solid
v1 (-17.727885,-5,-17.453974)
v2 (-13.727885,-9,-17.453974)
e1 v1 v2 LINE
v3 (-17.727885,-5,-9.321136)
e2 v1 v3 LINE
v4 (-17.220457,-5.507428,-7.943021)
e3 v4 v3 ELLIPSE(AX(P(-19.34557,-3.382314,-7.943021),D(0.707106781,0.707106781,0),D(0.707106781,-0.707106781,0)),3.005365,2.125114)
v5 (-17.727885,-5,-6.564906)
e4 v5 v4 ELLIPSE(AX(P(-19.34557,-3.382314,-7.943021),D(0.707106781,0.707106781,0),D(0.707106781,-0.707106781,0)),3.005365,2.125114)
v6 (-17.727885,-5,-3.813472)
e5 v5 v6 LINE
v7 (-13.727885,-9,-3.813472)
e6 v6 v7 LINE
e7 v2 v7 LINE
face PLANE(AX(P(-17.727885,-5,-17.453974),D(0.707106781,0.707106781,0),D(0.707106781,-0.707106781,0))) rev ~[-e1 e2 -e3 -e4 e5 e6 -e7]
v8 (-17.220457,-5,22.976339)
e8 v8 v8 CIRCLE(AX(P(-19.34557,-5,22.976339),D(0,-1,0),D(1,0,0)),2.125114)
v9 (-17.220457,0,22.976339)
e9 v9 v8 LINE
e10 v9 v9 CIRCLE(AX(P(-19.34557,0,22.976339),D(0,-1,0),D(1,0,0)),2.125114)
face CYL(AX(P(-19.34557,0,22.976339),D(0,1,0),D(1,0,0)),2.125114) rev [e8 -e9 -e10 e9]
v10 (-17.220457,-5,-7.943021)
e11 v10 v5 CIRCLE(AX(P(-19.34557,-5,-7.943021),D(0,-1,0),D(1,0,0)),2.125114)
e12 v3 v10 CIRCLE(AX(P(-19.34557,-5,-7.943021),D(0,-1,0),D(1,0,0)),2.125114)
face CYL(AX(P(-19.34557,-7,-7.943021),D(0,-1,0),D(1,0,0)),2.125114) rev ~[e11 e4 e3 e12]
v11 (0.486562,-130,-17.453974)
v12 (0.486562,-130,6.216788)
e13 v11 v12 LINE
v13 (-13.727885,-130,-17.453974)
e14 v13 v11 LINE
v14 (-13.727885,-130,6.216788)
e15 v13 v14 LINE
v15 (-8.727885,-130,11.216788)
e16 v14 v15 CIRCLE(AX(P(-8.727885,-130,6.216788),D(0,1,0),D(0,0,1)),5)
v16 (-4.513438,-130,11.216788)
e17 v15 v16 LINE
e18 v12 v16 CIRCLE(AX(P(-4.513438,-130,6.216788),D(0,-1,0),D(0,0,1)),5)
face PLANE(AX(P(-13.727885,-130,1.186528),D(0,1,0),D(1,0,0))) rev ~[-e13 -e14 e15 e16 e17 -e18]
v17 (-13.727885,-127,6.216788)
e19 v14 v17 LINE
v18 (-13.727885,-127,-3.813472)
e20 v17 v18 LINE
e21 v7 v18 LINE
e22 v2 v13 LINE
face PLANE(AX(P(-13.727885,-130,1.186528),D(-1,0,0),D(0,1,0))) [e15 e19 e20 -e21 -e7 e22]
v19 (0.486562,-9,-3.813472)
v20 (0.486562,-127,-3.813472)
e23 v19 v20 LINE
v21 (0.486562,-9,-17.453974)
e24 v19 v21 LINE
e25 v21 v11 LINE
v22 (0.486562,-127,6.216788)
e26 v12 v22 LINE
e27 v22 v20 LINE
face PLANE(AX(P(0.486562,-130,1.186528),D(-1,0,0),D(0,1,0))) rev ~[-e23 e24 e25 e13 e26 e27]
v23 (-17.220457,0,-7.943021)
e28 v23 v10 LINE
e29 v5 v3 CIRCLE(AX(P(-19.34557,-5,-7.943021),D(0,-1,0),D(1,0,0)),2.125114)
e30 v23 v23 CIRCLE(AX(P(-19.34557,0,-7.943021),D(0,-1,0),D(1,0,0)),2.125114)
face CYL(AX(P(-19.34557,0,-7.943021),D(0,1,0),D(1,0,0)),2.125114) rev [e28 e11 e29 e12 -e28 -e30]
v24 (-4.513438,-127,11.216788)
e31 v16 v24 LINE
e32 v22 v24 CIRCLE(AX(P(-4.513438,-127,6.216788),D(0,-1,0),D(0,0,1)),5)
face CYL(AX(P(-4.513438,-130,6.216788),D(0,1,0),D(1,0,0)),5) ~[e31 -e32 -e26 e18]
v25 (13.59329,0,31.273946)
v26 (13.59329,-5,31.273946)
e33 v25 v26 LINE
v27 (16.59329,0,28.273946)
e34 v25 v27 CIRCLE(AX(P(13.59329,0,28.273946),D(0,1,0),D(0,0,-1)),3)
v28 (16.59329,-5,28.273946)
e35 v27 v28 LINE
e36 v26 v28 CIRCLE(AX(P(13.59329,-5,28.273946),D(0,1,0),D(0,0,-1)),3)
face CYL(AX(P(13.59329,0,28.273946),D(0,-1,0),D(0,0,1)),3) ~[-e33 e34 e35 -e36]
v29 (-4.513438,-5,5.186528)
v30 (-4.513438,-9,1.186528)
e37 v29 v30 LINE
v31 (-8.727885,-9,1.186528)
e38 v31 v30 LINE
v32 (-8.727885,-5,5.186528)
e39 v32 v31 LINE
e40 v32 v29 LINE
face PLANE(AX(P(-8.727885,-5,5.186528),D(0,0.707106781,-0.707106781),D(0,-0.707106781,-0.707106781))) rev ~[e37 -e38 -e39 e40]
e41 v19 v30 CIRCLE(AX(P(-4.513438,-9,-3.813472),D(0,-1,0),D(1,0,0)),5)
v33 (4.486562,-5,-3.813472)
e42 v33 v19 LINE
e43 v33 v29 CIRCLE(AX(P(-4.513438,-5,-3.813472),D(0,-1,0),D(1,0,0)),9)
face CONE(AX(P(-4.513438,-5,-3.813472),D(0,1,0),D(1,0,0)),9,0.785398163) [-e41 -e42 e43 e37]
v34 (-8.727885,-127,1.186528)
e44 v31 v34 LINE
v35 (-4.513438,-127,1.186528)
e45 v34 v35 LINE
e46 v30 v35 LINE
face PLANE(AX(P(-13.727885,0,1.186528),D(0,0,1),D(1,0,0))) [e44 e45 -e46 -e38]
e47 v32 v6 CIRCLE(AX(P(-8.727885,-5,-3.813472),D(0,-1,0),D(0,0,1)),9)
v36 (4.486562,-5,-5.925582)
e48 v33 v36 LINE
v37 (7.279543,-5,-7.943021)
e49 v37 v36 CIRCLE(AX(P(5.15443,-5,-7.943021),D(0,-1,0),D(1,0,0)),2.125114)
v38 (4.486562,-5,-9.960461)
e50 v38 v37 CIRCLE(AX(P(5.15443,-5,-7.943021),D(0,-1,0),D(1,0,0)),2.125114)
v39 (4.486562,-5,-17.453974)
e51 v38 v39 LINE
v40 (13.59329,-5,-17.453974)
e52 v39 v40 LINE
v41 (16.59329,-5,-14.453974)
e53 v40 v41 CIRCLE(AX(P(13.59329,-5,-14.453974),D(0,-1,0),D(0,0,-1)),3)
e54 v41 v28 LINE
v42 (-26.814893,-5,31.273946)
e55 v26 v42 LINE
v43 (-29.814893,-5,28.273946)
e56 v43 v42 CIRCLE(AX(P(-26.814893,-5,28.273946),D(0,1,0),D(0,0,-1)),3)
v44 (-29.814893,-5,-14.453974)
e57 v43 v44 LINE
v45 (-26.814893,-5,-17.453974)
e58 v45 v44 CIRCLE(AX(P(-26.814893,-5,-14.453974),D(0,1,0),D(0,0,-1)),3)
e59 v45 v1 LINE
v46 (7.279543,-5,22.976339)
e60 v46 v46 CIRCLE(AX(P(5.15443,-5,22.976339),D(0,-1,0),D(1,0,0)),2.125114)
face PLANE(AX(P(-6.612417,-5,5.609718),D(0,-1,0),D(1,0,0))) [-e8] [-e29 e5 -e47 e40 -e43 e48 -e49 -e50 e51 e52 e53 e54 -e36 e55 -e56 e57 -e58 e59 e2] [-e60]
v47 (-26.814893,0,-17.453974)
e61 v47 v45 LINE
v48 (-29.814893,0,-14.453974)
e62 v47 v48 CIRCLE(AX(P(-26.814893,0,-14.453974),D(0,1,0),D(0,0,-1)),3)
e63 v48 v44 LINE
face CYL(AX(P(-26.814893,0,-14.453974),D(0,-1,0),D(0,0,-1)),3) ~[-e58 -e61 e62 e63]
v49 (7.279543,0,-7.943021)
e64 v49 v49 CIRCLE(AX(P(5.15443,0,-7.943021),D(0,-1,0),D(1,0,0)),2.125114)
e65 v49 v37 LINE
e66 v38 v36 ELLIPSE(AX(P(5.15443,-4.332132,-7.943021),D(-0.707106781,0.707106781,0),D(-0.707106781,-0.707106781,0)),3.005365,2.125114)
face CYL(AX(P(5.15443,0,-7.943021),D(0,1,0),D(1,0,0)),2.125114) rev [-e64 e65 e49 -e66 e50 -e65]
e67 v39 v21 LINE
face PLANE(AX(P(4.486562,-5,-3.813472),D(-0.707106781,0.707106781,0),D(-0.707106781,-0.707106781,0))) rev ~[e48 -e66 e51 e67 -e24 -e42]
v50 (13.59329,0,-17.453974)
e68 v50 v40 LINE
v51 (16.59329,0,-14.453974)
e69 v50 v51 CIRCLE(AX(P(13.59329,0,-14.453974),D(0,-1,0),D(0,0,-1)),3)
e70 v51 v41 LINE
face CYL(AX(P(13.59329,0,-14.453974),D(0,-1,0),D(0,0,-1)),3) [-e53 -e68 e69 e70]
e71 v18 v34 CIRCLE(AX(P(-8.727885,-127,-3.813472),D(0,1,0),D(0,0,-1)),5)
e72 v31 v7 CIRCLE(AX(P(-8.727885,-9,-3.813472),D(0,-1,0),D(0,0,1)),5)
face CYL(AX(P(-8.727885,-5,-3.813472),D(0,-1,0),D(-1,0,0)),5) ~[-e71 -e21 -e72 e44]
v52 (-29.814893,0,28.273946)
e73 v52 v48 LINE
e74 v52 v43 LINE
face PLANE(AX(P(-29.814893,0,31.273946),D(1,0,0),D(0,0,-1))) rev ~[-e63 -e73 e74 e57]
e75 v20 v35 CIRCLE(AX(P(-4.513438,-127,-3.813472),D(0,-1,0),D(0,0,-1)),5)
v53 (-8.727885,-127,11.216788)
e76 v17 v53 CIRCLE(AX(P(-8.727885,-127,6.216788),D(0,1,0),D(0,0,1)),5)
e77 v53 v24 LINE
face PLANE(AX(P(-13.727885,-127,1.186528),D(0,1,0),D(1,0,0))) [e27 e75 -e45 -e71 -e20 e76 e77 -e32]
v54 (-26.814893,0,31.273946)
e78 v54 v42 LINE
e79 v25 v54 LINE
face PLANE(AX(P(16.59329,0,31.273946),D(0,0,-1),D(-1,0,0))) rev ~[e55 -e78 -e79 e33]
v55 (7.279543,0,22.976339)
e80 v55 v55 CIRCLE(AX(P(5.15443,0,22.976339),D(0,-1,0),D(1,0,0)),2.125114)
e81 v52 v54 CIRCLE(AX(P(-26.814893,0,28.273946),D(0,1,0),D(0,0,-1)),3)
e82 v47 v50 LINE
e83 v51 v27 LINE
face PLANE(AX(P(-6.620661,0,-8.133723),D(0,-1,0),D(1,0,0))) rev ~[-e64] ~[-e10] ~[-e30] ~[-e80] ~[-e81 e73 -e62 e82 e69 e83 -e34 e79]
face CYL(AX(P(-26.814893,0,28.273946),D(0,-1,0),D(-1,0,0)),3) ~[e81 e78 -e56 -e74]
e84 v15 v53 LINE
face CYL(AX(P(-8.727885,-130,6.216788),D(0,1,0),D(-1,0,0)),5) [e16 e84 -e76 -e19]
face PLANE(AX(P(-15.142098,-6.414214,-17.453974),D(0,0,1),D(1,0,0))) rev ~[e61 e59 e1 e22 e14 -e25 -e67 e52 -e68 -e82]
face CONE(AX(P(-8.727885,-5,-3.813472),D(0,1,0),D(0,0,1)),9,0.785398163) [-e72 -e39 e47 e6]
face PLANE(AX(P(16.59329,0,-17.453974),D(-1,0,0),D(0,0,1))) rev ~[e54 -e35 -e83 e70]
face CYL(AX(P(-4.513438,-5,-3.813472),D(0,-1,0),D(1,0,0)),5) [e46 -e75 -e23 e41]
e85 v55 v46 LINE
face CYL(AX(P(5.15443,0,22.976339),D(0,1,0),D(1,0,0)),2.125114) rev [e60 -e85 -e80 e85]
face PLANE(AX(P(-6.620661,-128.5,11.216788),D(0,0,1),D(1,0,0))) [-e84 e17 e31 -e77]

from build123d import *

# Parameters (mm, degrees)
F0_R         = 2.1251138046
F1_DEPTH     = 5
F0_W         = 14.2144468555
F0_H         = 18.6405025888
F2_DEPTH     = 130
F3_W         = 14.2144468555
F3_H         = 3
F4_DEPTH     = 10.03026
F5_R         = 5
F6_R         = 3
F7_T1_DEPTH  = 4.2144468555
F7_T6_DEPTH  = 13.6405025888
F7_S7_R      = 2.1251138046
F7_T8_DEPTH  = 9
F7_T10_ANGLE = 90
F7_T12_ANGLE = 90
F7_T16_DEPTH = 13.6405025888
F7_S17_R     = 2.1251138046
F7_T18_DEPTH = 9


# Not quite as in the source:
# - a fillet or chamfer that OpenCascade refuses, or shapes differently, is made with other operations: its cross-section is extruded or revolved along the edge and cut away or added


with BuildPart() as f1:
    # F0 (on Front) → F1 (new body)
    with BuildSketch(Plane.XZ):
        Polygon((16.5932904929, 31.273946166), (-29.8148933798, 31.273946166), (-29.8148933798, -17.4539741129), (-13.7278847396, -17.4539741129), (-13.7278847396, 1.186528476), (0.4865621158, 1.186528476), (0.4865621158, -17.4539741129), (16.5932904929, -17.4539741129), align=None)
        with Locations((-19.3455703557, -7.9430211366)):
            Circle(F0_R, mode=Mode.SUBTRACT)
        with Locations((5.1544296443, -7.9430211366)):
            Circle(F0_R, mode=Mode.SUBTRACT)
        with Locations((-19.3455703557, 22.9763388634)):
            Circle(F0_R, mode=Mode.SUBTRACT)
        with Locations((5.1544296443, 22.9763388634)):
            Circle(F0_R, mode=Mode.SUBTRACT)
    extrude(amount=F1_DEPTH)

    # F0 (on Front) → F2 (join)
    with BuildSketch(Plane.XZ):
        with Locations((-6.6206613119, -8.1337228185)):
            Rectangle(F0_W, F0_H)
    extrude(amount=F2_DEPTH)

    # F3 (on face) → F4 (join)
    with BuildSketch(Plane.XY.offset(1.186528476)):
        with Locations((-6.6206613119, -128.5)):
            Rectangle(F3_W, F3_H)
    extrude(amount=F4_DEPTH)

    # F5
    f5_edges = [f1.edges().sort_by_distance(p)[0] for p in [
        (0.486562, -66, 1.186528),
        (-13.727885, -66, 1.186528),
        (-13.727885, -128.5, 11.216788),
        (0.486562, -128.5, 11.216788),
    ]]
    fillet(f5_edges, radius=F5_R)

    # F6
    f6_edges = [f1.edges().sort_by_distance(p)[0] for p in [
        (-29.814893, -2.5, 31.273946),
        (16.59329, -2.5, 31.273946),
        (-29.814893, -2.5, -17.453974),
        (16.59329, -2.5, -17.453974),
    ]]
    fillet(f6_edges, radius=F6_R)

    # F7: chamfer of 4 on 2 edges, made by hand

    # F7_s2 → F7_t1 (join)
    with BuildSketch(Plane.YZ.offset(-8.7278847396)):
        Polygon((-5, 5.186528476), (-9, 1.186528476), (-5, 1.186528476), align=None)
    extrude(amount=F7_T1_DEPTH)


with BuildPart() as f7_tool4:
    # F7_s5 → F7_t6 (new body)
    with BuildSketch(Plane.XY.offset(-3.813471524)):
        Polygon((4.4865621158, -5), (0.4865621158, -9), (0.4865621158, -5), align=None)
    extrude(amount=-F7_T6_DEPTH)

    # F7_s7 → F7_t8 (cut, symmetric)
    with BuildSketch(Plane.XZ.offset(7)):
        with Locations((5.1544296443, -7.9430211366)):
            Circle(F7_S7_R)
    extrude(amount=F7_T8_DEPTH, both=True, mode=Mode.SUBTRACT)


with BuildPart() as f1_1:
    add(f1.part)

    # F7_t3: union F7_tool4
    add(f7_tool4.part)

    # F7_s9 → F7_t10 (revolve)
    with BuildSketch(Plane.XY.offset(-3.813471524)):
        Polygon((4.4865621158, -5), (0.4865621158, -9), (0.4865621158, -5), align=None)
    revolve(axis=Axis((-4.5134378842, -5, -3.813471524), (0, -1, 0)), revolution_arc=F7_T10_ANGLE)

    # F7_s11 → F7_t12 (revolve)
    with BuildSketch(Plane.YZ.offset(-8.7278847396)):
        Polygon((-5, 5.186528476), (-9, 1.186528476), (-5, 1.186528476), align=None)
    revolve(axis=Axis((-8.7278847396, -5, -3.813471524), (0, -1, 0)), revolution_arc=F7_T12_ANGLE)


with BuildPart() as f7_tool14:
    # F7_s15 → F7_t16 (new body)
    with BuildSketch(Plane.XY.offset(-17.4539741129)):
        Polygon((-17.7278847396, -5), (-13.7278847396, -9), (-13.7278847396, -5), align=None)
    extrude(amount=F7_T16_DEPTH)

    # F7_s17 → F7_t18 (cut, symmetric)
    with BuildSketch(Plane.XZ.offset(7)):
        with Locations((-19.3455703557, -7.9430211366)):
            Circle(F7_S17_R)
    extrude(amount=F7_T18_DEPTH, both=True, mode=Mode.SUBTRACT)


with BuildPart() as f1_2:
    add(f1_1.part)

    # F7_t13: union F7_tool14
    add(f7_tool14.part)


solid = f1_2.part
